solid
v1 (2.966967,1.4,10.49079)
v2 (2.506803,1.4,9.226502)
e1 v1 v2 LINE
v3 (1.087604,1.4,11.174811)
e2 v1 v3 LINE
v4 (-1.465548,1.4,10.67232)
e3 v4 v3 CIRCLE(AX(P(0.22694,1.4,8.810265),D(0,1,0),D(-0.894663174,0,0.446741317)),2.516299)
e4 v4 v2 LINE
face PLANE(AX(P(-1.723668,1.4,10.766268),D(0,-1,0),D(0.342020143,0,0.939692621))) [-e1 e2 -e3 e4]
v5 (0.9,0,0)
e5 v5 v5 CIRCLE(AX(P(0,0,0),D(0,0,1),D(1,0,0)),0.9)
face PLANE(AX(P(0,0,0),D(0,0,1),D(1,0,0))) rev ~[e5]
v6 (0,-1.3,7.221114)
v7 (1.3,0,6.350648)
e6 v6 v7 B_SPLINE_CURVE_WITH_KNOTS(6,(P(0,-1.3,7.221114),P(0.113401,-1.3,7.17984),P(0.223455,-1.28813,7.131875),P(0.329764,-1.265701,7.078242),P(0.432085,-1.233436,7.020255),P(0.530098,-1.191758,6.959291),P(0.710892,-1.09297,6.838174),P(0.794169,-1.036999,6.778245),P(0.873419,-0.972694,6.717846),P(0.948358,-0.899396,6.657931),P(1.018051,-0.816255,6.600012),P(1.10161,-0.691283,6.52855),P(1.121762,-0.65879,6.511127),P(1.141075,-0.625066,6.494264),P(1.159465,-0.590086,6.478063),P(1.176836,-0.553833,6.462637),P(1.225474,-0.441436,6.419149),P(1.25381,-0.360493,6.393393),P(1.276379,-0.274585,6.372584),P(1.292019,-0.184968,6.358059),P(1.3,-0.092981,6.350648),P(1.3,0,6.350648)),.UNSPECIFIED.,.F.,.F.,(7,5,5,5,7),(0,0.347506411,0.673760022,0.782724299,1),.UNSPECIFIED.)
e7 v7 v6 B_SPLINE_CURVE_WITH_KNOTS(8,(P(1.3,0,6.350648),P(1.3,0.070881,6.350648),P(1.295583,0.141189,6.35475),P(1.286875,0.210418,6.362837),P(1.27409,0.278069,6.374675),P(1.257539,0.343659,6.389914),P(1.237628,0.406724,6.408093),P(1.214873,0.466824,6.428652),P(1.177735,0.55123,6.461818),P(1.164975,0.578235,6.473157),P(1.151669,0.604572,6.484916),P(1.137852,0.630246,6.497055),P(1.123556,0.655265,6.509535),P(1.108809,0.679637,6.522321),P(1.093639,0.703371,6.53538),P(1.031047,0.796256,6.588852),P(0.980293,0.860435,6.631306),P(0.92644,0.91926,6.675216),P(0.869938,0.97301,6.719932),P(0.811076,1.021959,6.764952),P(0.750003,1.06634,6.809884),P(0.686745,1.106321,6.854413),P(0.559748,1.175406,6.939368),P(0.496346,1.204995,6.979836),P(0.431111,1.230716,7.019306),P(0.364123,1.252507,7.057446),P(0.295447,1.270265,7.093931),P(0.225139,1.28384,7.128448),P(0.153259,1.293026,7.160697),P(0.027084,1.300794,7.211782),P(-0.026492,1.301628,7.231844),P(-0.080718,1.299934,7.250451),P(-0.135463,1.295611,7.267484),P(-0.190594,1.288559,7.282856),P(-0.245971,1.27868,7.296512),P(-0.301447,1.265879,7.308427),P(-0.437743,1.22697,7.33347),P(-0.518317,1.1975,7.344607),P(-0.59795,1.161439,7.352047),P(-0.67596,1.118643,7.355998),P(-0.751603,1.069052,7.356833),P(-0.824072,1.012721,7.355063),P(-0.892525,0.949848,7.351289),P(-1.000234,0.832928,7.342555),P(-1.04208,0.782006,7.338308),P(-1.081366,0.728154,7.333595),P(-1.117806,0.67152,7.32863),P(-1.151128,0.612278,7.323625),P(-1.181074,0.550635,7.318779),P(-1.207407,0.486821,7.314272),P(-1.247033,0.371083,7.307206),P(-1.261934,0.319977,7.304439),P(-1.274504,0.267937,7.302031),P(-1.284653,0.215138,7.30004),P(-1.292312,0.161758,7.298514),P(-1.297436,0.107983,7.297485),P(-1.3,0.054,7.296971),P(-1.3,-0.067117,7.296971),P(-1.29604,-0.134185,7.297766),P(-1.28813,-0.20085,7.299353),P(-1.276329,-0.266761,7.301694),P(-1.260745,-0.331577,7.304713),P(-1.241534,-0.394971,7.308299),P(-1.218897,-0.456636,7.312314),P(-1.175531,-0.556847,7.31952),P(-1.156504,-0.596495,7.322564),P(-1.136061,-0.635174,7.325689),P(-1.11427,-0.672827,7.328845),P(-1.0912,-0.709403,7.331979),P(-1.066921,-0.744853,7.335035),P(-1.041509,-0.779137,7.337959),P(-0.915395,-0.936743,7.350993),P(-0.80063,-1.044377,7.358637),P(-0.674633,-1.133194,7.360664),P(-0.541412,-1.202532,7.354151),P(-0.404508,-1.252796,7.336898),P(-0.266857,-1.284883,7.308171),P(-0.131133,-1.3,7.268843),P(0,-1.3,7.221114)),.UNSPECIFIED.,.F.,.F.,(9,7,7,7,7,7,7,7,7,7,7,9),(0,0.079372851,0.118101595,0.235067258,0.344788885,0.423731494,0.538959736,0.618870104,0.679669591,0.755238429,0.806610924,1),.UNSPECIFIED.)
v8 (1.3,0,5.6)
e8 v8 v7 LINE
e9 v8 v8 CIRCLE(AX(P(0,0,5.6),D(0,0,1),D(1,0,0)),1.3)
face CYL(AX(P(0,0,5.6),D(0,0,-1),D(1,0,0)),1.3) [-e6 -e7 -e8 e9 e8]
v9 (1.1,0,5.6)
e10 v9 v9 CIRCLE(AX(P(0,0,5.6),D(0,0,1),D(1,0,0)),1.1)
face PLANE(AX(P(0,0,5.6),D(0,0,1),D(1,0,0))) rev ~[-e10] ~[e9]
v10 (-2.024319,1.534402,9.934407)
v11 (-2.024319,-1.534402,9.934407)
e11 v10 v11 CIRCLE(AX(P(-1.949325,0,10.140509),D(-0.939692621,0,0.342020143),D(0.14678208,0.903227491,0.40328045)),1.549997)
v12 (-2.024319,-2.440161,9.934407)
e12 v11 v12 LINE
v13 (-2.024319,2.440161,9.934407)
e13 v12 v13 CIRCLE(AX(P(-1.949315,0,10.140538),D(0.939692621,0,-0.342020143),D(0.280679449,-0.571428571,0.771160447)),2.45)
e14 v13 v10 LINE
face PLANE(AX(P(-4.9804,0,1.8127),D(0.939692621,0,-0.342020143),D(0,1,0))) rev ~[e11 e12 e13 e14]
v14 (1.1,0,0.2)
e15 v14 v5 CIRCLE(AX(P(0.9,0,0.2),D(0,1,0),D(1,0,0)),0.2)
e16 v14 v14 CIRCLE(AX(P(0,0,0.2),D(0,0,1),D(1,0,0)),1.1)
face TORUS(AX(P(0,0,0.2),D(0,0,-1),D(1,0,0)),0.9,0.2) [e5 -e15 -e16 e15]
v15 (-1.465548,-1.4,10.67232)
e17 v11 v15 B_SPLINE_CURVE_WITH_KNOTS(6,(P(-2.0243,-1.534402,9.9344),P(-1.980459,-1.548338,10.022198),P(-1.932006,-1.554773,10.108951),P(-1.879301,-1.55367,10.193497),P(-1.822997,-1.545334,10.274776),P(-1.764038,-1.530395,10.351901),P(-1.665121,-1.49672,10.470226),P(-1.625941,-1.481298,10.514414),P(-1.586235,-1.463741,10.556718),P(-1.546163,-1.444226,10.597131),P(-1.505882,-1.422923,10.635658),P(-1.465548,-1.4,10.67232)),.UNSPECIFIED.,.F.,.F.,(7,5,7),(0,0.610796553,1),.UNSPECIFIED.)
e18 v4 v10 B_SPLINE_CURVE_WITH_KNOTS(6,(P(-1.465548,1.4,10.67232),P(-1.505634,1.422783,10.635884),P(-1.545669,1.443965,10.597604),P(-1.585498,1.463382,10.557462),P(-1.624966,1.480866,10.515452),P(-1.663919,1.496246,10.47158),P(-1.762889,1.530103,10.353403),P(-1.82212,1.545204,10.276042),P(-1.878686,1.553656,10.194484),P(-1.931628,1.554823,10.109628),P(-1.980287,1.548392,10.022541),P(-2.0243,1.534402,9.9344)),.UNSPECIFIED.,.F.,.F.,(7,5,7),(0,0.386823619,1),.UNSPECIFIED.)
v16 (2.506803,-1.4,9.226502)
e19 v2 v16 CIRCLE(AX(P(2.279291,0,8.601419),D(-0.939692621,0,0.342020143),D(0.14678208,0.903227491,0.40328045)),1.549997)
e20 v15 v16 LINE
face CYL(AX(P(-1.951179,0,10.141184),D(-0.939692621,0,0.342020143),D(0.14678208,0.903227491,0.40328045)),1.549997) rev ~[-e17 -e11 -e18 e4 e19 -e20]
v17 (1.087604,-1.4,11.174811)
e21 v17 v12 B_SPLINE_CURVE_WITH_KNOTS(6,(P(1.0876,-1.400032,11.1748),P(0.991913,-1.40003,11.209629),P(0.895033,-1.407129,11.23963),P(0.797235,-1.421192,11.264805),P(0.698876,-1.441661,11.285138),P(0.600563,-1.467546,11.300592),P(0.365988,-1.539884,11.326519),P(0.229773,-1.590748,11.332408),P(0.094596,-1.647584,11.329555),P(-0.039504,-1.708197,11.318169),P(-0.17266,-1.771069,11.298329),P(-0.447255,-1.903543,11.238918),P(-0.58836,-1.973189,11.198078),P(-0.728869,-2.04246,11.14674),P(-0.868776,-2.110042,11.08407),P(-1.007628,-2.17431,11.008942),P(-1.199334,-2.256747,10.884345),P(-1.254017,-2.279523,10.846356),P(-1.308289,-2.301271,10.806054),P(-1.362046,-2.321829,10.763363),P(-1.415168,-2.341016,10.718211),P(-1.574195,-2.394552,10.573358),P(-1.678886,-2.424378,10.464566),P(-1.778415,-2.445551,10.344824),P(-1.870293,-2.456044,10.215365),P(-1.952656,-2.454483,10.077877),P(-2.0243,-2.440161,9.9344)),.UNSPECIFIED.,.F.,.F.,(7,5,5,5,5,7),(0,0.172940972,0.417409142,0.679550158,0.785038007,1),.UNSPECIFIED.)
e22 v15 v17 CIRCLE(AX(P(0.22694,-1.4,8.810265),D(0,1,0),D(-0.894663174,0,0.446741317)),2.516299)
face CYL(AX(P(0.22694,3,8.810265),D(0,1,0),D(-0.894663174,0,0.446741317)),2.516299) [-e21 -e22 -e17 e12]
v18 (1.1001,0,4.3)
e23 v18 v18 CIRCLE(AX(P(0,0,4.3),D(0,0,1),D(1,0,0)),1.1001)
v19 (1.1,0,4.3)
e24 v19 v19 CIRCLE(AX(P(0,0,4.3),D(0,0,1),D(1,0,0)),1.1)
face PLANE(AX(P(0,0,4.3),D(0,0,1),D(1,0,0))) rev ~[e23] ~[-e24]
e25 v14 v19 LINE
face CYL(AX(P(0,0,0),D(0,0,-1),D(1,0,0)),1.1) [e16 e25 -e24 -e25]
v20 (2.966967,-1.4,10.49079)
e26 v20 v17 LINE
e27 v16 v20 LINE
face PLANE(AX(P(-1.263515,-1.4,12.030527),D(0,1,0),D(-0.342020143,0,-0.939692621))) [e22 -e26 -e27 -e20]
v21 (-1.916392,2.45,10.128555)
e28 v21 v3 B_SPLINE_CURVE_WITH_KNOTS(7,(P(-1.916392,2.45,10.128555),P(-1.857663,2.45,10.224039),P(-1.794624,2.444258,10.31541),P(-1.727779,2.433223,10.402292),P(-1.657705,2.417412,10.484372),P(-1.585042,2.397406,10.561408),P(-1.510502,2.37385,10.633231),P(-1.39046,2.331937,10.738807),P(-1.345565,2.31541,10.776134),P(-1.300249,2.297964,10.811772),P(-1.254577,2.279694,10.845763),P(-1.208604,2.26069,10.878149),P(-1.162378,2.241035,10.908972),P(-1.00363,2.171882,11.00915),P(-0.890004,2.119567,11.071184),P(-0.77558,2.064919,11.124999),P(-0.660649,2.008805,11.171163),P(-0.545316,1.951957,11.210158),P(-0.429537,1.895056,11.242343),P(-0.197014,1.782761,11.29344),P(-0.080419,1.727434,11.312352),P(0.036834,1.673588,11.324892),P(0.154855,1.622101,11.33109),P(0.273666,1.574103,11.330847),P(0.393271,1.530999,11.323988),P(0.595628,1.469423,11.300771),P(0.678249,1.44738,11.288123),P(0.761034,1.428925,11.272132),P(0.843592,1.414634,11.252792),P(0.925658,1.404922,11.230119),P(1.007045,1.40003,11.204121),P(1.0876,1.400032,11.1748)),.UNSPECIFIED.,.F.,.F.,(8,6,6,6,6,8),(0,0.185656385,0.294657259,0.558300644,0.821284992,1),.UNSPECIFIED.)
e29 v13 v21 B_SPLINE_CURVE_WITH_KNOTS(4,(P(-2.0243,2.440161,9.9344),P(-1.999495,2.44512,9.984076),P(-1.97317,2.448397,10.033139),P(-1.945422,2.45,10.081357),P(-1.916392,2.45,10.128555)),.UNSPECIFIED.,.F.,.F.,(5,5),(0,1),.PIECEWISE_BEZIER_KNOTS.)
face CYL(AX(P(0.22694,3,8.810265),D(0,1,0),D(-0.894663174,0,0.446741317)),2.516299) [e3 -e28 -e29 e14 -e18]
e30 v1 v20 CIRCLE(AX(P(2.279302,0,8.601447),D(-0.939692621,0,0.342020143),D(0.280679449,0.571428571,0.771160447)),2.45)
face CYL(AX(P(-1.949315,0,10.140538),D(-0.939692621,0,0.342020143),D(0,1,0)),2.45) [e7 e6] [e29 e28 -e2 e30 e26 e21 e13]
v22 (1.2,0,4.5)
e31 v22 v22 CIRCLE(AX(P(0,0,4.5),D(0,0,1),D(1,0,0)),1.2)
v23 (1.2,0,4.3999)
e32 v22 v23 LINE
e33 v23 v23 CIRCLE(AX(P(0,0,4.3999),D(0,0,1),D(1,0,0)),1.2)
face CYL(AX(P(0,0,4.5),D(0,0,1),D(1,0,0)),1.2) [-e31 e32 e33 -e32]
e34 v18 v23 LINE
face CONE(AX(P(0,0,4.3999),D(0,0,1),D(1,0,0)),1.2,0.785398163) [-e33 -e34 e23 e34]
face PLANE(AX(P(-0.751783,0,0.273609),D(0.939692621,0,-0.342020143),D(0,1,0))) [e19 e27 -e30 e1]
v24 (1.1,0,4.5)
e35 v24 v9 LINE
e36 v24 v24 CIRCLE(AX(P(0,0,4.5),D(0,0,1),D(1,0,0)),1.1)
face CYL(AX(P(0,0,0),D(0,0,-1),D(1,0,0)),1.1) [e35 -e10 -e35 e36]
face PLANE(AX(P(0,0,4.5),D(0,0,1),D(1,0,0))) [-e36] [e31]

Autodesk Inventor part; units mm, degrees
sketch "Sketch1" plane through (0, 0, 0) normal (0, 0, 1) x (1, 0, 0)
  circle A0 centre (0, 0) radius 1.1
  dimension "d0" = 2.2
extrude "Extrusion1" add sketch "Sketch1" along normal blind 5.6
ref_plane "Work Plane1" through (0, 0, 4.5) normal (0, 0, 1) x (1, 0, 0)
sketch "Sketch2" plane through (0, 0, 4.5) normal (0, 0, 1) x (1, 0, 0)
  circle A0 centre (0, 0) radius 1.1 projected
  circle A1 centre (0, 0) radius 1.2
  dimension "d4" = 0.1
extrude "Extrusion2" add sketch "Sketch2" against normal blind 0.2
chamfer "Chamfer1" distance 0.1 angle 45 1 edges at (-1.2, 0, 4.3)
fillet "Fillet1" radius 0.2 1 edges at (-1.1, 0, 0)
sketch "Sketch3" plane through (0, 0, 5.6) normal (0, 0, 1) x (1, 0, 0)
  circle A0 centre (0, 0) radius 1.1 projected
  circle A1 centre (0, 0) radius 1.3
  dimension "d11" = 0.2
extrude "Extrusion3" add sketch "Sketch3" along normal blind 3 contours A0 | A1
ref_plane "Work Plane3" through (-4.9804, 0, 1.8127) normal (0.9396926, 0, -0.3420201) x (0, 1, 0)
ref_plane "Work Plane2" through (0, 0, 0) normal (0.9396926, 0, -0.3420201) x (0, 1, 0)
sketch "Sketch4" plane through (-4.9804, 0, 1.8127) normal (0.9396926, 0, -0.3420201) x (0, 1, 0)
  ellipse E0 centre (0, 5.2623) end of major axis (1.3, 5.2623) minor radius 0.4446 projected
  line L0 (-1.3, 5.2623) -> (-1.3, 8.0814) projected
  circle A0 centre (0, 8.8623) radius 2.45
  point P0 (0, 0)
  dimension "d16" = 4.9
  dimension "d17" = 3.6
  dimension "d18" = 1.3
extrude "Extrusion4" add sketch "Sketch4" along normal blind 4.5 contours A0
sketch "Sketch5" plane through (-1.9493, 0, 10.1405) normal (-0.9396926, 0, 0.3420201) x (0.3420201, 0, 0.9396926)
  circle A0 centre (0, 0) radius 2.45 projected
  arc A1 (0.6652, 1.4) -> (0.6652, -1.4) centre (0, 0) ccw
  line L0 (0.6652, 1.4) -> (3.89, 1.4)
  line L1 (3.89, 1.4) -> (3.89, -1.4)
  line L2 (3.89, -1.4) -> (0.6652, -1.4)
  point P0 (-8.8623, 0)
  dimension "d21" = 0.9
  dimension "d22" = 1.4
  dimension "d23" = 1.4
  dimension "d25" = 3.89
extrude "Extrusion5" cut sketch "Sketch5" against normal blind 4.5 contours A0 L2 A1 L0 | A0 L0 L1 L2 picked at (1.2601, 0)
ref_plane "Work Plane4" through (0, 3, 0) normal (0, 1, 0) x (-1, 0, 0)
sketch "Sketch6" plane through (0, 3, 0) normal (0, 1, 0) x (-1, 0, 0)
  line L0 (-1.0876, 11.1748) -> (1.2616, 12.0299)
  line L1 (2.0243, 9.9344) -> (1.2616, 12.0299)
  arc A0 (2.0243, 9.9344) -> (-1.0876, 11.1748) centre (-0.227, 8.8102) ccw
  point P0 (0, 0)
  dimension "d29" = 2.5
  dimension "d30" = 2.23
extrude "Extrusion6" cut sketch "Sketch6" against normal through all
properties part number "Lego hand"
